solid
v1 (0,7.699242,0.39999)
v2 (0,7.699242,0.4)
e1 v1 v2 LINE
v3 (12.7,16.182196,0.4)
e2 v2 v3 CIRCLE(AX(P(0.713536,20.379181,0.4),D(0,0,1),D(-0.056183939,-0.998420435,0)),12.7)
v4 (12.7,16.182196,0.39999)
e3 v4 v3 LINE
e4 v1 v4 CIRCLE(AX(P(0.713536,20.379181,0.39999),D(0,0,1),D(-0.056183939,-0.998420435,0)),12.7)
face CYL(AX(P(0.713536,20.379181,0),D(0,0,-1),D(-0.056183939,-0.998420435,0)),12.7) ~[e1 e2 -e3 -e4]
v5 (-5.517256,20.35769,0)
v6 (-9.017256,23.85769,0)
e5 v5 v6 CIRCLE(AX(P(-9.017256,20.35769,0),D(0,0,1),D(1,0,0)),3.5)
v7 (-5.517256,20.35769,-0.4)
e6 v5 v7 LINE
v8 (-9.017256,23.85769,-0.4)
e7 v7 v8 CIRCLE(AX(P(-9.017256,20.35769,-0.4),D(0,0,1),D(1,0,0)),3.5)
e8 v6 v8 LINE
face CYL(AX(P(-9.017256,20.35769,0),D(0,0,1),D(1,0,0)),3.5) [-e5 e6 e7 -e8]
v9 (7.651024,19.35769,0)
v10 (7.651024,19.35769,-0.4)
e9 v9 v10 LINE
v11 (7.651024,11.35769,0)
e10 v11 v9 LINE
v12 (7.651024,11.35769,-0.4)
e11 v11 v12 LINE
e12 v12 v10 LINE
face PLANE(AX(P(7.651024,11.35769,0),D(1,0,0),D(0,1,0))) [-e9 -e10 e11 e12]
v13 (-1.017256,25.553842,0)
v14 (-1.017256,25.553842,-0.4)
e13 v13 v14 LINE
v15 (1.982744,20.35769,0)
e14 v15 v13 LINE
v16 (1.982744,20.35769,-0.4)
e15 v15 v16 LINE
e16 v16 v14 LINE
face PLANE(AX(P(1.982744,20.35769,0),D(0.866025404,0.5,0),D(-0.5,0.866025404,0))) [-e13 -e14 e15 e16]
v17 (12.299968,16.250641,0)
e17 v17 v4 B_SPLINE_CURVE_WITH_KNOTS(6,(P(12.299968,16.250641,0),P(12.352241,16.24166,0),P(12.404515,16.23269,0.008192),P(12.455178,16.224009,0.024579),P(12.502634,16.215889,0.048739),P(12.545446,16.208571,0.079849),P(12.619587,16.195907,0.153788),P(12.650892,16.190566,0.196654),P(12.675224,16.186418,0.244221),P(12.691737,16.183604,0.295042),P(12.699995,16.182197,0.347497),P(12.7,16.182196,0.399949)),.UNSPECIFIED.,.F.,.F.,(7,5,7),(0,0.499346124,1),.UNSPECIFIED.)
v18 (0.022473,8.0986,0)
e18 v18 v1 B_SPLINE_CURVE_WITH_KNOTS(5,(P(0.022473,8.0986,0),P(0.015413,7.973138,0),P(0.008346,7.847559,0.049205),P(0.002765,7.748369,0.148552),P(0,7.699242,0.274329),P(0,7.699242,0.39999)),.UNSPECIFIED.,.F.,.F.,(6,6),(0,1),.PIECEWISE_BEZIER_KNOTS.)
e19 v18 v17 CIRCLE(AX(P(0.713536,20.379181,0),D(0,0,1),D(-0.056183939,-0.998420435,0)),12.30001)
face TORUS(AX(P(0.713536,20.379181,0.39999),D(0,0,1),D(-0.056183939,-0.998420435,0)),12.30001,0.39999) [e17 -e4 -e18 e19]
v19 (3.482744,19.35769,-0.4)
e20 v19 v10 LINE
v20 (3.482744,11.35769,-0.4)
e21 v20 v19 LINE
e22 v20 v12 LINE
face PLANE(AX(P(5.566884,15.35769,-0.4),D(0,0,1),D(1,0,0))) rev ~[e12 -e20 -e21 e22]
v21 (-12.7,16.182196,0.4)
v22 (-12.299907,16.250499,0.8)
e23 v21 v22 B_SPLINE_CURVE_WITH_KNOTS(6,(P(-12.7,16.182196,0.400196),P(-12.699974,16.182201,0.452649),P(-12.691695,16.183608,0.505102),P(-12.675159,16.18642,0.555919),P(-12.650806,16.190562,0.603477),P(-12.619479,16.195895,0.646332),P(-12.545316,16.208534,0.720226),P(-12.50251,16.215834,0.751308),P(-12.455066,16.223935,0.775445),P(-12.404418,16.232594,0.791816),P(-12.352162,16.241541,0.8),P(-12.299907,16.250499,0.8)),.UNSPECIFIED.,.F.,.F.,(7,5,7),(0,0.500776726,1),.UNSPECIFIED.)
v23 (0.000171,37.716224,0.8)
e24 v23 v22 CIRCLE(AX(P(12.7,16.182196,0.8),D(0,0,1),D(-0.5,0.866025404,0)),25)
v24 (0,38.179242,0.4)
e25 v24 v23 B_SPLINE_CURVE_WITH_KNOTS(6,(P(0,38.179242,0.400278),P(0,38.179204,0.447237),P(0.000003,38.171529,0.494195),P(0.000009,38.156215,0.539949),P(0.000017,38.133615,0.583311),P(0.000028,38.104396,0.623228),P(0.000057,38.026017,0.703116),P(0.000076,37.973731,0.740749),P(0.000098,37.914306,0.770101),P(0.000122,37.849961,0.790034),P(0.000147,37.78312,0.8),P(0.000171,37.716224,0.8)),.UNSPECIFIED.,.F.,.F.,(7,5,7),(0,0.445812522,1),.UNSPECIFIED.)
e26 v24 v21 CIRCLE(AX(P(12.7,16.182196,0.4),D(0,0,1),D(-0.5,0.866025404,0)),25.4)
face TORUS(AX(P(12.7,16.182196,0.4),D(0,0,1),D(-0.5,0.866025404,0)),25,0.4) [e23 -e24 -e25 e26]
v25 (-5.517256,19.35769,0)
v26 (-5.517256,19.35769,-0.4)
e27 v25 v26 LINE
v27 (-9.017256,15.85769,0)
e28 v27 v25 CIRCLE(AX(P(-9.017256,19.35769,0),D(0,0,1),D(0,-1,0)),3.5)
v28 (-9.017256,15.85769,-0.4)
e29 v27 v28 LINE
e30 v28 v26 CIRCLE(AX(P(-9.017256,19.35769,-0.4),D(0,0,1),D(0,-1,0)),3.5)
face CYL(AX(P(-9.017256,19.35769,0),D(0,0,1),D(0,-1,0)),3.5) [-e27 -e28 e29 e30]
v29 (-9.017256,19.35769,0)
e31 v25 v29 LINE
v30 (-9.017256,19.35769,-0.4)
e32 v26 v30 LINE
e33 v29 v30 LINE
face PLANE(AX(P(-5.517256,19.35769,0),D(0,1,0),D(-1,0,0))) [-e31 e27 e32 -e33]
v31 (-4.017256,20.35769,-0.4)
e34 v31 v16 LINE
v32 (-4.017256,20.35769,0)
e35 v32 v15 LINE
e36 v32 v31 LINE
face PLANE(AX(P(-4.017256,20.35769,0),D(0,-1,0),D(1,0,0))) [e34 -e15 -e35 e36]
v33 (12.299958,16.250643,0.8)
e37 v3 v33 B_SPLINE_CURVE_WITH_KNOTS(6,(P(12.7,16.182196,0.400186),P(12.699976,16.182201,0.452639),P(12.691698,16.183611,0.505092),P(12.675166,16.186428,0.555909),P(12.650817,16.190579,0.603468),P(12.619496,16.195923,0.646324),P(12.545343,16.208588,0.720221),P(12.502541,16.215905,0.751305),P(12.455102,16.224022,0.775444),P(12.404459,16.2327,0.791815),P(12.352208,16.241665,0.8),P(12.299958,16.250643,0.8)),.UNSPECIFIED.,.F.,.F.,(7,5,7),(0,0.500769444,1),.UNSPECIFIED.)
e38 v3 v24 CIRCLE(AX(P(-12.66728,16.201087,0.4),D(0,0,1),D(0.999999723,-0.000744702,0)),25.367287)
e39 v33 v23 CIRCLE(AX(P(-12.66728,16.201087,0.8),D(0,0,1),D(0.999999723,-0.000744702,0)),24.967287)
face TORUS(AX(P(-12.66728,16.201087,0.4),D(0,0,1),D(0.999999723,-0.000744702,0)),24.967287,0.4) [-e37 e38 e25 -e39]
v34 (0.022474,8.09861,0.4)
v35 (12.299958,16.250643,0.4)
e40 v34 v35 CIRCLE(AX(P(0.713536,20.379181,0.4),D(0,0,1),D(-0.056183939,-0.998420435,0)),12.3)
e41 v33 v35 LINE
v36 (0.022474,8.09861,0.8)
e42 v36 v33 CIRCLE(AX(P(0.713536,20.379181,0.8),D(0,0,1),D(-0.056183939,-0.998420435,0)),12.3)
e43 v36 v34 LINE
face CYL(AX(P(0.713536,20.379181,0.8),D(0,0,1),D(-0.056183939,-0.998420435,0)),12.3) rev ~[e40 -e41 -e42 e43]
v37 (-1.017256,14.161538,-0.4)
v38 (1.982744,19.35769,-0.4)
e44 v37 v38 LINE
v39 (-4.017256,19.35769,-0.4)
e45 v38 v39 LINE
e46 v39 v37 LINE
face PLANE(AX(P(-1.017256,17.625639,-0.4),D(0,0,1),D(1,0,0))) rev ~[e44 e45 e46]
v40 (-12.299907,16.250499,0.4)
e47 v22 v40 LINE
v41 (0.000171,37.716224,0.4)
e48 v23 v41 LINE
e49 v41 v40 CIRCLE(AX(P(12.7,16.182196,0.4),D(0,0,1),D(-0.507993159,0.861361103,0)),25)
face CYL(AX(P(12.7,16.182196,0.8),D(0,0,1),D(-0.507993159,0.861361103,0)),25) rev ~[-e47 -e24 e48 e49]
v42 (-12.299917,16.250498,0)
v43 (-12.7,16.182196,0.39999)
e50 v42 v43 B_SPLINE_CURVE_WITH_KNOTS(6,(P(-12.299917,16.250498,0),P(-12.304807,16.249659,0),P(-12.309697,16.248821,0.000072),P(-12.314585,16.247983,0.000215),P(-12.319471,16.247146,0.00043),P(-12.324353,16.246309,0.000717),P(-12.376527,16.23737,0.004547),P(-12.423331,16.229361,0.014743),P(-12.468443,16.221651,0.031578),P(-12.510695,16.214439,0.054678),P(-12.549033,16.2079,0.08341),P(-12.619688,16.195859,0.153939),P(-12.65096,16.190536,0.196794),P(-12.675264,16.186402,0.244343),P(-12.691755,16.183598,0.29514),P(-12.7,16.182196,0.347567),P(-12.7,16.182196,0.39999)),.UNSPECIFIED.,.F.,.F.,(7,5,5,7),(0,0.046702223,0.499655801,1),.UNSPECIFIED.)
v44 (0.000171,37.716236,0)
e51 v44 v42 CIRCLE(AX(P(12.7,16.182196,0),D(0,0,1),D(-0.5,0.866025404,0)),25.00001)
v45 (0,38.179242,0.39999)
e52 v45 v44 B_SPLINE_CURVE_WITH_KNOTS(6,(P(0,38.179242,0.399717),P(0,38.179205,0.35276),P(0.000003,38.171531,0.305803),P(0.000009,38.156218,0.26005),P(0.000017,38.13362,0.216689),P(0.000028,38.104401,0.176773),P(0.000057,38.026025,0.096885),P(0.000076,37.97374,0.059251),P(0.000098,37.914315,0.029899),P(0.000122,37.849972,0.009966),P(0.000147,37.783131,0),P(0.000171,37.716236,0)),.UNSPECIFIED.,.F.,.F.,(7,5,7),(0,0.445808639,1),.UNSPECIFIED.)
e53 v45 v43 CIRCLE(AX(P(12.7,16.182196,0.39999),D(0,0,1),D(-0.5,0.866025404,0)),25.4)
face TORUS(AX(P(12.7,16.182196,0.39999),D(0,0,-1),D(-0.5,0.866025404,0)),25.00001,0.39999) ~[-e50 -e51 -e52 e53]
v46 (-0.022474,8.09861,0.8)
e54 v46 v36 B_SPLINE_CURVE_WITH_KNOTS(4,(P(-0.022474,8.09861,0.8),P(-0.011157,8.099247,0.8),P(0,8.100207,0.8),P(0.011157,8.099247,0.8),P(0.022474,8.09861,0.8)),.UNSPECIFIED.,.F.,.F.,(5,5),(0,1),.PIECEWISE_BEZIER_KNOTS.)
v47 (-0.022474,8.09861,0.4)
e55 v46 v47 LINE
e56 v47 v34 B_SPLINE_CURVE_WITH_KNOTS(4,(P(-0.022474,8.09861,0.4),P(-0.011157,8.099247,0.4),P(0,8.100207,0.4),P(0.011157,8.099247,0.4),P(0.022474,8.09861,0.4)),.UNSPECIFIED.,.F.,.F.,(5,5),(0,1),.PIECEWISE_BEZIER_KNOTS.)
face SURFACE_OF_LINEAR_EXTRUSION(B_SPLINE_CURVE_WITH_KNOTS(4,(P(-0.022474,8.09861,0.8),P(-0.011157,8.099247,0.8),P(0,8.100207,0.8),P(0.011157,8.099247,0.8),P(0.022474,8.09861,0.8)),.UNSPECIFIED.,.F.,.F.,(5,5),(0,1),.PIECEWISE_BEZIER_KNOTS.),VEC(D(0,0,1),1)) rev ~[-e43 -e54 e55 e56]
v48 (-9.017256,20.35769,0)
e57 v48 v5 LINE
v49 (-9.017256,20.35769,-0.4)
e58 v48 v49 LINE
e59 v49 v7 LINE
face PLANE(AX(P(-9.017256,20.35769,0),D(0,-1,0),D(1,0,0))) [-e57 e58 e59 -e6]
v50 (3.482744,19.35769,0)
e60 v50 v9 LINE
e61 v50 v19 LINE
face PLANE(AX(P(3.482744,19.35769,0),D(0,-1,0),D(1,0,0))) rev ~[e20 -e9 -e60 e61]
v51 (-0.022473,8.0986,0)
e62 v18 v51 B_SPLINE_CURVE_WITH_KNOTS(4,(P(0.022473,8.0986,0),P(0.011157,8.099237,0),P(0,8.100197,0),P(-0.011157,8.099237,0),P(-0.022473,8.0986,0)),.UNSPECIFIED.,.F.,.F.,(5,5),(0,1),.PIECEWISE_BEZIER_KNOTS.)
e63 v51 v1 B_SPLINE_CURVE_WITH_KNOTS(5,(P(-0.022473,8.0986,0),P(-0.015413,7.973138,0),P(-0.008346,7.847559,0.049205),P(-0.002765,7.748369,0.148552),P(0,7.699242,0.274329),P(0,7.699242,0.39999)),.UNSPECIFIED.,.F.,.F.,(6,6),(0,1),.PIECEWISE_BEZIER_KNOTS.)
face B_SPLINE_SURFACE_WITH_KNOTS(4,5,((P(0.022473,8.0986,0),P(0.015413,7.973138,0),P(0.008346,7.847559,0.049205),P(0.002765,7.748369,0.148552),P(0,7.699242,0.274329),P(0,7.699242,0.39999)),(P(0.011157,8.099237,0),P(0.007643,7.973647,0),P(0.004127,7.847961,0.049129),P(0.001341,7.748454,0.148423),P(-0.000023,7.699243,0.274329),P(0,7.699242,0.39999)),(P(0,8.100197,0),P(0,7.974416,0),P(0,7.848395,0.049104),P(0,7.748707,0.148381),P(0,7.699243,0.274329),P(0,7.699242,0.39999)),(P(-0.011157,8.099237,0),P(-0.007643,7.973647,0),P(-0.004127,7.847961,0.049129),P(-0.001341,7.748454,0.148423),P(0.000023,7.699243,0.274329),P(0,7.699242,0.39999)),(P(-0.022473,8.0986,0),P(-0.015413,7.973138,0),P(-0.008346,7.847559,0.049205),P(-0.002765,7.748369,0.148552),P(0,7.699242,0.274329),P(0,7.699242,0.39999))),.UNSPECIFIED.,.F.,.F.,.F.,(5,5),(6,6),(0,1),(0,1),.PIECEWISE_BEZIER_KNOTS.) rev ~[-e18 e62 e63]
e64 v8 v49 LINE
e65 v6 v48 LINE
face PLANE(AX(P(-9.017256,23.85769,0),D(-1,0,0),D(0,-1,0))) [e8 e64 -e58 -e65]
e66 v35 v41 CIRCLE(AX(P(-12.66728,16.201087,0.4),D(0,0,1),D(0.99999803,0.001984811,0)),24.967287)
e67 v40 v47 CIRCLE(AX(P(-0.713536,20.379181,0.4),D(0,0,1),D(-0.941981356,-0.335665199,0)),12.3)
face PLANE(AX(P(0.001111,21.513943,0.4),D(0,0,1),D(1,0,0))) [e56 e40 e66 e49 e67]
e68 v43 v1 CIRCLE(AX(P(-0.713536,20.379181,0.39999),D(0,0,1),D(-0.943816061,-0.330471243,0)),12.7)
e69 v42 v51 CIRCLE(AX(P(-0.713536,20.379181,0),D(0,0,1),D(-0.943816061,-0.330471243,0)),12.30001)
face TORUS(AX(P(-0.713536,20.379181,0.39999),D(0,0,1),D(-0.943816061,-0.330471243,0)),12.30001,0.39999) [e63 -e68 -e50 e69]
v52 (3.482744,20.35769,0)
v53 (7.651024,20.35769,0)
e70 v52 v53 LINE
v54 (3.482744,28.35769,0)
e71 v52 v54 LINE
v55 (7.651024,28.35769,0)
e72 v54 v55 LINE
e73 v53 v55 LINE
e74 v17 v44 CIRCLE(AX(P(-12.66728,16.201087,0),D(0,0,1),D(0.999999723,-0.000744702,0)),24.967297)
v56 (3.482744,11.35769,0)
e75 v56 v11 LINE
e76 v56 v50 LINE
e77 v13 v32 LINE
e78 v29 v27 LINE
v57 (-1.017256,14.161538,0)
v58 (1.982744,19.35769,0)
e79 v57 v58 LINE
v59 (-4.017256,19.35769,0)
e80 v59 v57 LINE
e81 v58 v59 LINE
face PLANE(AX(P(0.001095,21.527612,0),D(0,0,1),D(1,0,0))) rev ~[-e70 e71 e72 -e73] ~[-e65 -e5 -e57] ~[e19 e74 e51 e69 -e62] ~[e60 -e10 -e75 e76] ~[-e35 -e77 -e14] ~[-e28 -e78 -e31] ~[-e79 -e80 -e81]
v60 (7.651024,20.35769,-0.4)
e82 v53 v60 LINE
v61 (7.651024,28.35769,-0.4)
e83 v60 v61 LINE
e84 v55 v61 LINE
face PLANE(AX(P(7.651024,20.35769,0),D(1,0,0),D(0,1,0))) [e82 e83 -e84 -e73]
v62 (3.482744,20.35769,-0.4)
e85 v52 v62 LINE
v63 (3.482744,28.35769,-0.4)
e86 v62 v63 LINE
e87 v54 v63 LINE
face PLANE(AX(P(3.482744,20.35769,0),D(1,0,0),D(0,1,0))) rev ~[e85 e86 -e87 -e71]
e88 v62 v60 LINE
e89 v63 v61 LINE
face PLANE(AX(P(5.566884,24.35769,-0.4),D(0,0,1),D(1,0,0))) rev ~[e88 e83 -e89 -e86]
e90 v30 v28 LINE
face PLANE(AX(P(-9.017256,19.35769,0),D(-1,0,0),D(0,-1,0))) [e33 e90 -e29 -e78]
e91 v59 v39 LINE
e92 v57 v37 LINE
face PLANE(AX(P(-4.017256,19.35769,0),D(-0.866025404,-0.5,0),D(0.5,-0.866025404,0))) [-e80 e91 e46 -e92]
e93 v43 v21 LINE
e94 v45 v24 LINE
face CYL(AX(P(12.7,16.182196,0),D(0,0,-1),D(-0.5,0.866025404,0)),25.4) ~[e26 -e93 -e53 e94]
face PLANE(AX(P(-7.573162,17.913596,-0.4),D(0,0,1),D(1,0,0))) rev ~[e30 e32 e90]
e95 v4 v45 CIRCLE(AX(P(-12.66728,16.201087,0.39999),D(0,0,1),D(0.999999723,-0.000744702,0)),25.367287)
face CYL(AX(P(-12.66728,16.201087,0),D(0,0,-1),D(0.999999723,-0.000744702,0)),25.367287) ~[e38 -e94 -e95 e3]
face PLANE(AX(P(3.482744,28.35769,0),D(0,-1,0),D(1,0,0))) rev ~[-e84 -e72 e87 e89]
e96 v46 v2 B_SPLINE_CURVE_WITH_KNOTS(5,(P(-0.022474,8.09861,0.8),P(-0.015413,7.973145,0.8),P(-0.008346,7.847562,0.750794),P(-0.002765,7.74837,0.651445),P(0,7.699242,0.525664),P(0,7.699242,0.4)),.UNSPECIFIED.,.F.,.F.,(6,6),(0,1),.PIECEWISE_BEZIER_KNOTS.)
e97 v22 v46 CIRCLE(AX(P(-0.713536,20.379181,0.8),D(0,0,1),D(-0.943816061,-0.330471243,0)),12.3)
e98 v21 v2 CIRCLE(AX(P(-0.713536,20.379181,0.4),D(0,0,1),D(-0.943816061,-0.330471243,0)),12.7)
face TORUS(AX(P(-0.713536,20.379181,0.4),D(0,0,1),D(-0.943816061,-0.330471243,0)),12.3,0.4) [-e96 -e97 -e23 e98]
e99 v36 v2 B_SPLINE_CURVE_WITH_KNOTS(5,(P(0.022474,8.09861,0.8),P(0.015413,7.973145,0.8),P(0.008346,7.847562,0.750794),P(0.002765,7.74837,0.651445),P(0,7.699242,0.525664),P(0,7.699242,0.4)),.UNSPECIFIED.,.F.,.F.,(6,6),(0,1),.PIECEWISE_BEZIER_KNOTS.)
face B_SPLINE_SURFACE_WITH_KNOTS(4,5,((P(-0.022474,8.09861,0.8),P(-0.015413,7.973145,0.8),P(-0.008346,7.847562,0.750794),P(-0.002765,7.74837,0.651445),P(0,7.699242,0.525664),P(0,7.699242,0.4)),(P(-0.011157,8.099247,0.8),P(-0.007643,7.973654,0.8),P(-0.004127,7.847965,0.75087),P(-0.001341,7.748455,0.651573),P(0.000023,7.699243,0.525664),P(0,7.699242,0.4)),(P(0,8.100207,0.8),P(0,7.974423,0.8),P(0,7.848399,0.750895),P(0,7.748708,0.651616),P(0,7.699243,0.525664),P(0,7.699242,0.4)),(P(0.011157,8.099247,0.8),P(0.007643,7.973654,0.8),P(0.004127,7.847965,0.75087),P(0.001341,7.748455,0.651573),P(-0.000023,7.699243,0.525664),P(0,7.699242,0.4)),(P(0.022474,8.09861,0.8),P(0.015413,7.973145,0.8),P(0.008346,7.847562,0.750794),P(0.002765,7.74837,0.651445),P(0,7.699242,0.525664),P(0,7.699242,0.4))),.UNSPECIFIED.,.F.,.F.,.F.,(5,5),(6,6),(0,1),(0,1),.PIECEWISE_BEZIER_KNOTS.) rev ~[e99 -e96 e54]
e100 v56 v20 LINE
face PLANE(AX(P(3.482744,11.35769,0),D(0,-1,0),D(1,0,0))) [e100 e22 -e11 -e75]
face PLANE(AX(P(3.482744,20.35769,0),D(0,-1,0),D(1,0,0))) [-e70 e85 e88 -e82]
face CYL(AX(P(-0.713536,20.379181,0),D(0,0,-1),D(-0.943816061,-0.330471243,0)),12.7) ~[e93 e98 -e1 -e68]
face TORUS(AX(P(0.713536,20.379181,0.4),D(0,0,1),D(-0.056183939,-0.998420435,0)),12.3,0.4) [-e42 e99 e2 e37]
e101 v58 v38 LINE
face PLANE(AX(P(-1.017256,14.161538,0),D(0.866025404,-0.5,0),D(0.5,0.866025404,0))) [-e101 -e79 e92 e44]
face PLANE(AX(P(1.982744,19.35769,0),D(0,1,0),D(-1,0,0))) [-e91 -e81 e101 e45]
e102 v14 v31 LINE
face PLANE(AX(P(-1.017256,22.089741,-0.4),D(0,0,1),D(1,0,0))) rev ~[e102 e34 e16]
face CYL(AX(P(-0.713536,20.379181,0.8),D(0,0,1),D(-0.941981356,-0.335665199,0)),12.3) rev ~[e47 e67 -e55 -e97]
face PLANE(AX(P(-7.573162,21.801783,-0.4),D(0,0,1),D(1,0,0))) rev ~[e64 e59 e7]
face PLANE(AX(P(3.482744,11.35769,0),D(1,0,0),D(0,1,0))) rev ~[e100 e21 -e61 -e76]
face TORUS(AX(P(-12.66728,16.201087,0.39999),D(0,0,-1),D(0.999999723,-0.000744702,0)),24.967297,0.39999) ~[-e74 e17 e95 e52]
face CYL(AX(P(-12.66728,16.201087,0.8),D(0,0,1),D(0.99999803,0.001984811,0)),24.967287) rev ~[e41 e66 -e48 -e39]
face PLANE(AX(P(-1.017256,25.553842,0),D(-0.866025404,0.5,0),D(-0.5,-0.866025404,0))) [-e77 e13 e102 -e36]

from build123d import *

# Parameters (mm, degrees)
F1_DEPTH = 0.8
F2_R     = 0.4
F3_R     = 0.39999
F4_W     = 4.168279469
F4_H     = 8
F5_DEPTH = 0.4
F6_DEPTH = 0.4


# Not quite as in the source:
# - a fillet or chamfer is up to 0.001 mm smaller than in the source, because OpenCascade refuses the exact size


with BuildPart() as f1:
    # F0 (on Top) → F1 (new body)
    with BuildSketch(Plane.XY):
        with BuildLine():
            ThreePointArc((0, 38.1792416396), (-9.2970452561, 28.8821963835), (-12.7, 16.1821963835))
            ThreePointArc((-12.7, 16.1821963835), (-7.7676026835, 9.8183978835), (0, 7.6992416396))
            ThreePointArc((0, 7.6992416396), (7.7676026835, 9.8183978835), (12.7, 16.1821963835))
            ThreePointArc((12.7, 16.1821963835), (9.3014350381, 28.8847308253), (0, 38.1792416396))
        make_face()
    extrude(amount=F1_DEPTH)

    # F2
    f2_edges = [f1.edges().sort_by_distance(p)[0] for p in [
        (-9.297045, 28.882196, 0.8),
        (-7.767603, 9.818398, 0.8),
        (7.767603, 9.818398, 0.8),
        (9.301435, 28.884731, 0.8),
    ]]
    fillet(f2_edges, radius=F2_R)

    # F3 (radius 0.4 in the source; OpenCascade refuses exactly that, so slightly less here)
    f3_edges = [f1.edges().sort_by_distance(p)[0] for p in [
        (7.767603, 9.818398, 0),
        (9.301435, 28.884731, 0),
        (-7.767603, 9.818398, 0),
        (-9.297045, 28.882196, 0),
    ]]
    fillet(f3_edges, radius=F3_R)

    # F4 (on Top) + F1_face (on face) + F1_face1 (on face) → F5 (cut)
    with BuildSketch(Plane.XY):
        Polygon((1.9827442754, 19.357689971), (-4.0172557246, 19.357689971), (-1.0172557246, 14.1615375483), align=None)
        with BuildLine():
            Line((-9.0172557246, 19.357689971), (-9.0172557246, 15.857689971))
            ThreePointArc((-9.0172557246, 15.857689971), (-6.5423819904, 16.8828162368), (-5.5172557246, 19.357689971))
            Line((-5.5172557246, 19.357689971), (-9.0172557246, 19.357689971))
        make_face()
        Polygon((-1.0172557246, 25.5538423937), (-4.0172557246, 20.357689971), (1.9827442754, 20.357689971), align=None)
        with Locations((5.56688401, 15.357689971)):
            Rectangle(F4_W, F4_H)
        with BuildLine():
            Line((-9.0172557246, 20.357689971), (-5.5172557246, 20.357689971))
            ThreePointArc((-5.5172557246, 20.357689971), (-6.5423819904, 22.8325637051), (-9.0172557246, 23.857689971))
            Line((-9.0172557246, 23.857689971), (-9.0172557246, 20.357689971))
        make_face()
        with Locations((5.56688401, 24.357689971)):
            Rectangle(F4_W, F4_H)
    with BuildSketch(Plane(origin=(0.0014081173, 21.2624606857, 0.8), x_dir=(1, 0, 0), z_dir=(0, 0, 1))):
        with BuildLine():
            ThreePointArc((-0.0012370935, 16.4537632815), (-8.9926932828, 7.3490618207), (-12.3013148115, -5.0119614651))
            ThreePointArc((-12.3013148115, -5.0119614651), (-7.5186387645, -11.1302175722), (-0.0238816927, -13.1638508721))
            add(Edge.make_bspline(
                [(-0.0238816927, -13.1638508721), (-0.0125655835, -13.1632140826), (-0.0014081173, -13.1622533084), (0.009749349, -13.1632140826), (0.0210654582, -13.1638508721)],
                knots=[0, 0, 0, 0, 0, 1, 1, 1, 1, 1], degree=4))
            ThreePointArc((0.0210654582, -13.1638508721), (7.5158860187, -11.1301754171), (12.2985497378, -5.0118178891))
            ThreePointArc((12.2985497378, -5.0118178891), (8.9943044567, 7.3515302466), (-0.0012370935, 16.4537632815))
        make_face()
    with BuildSketch(Plane(origin=(0.001408117, 21.262461098, 0), x_dir=(1, 0, 0), z_dir=(0, 0, -1))):
        with BuildLine():
            ThreePointArc((12.2985597415, 5.0118200202), (7.5158922747, 11.1301836793), (0.0210648966, 13.1638612686))
            add(Edge.make_bspline(
                [(0.0210648966, 13.1638612686), (0.0097490703, 13.1632244951), (-0.001408117, 13.1622637449), (-0.0125653043, 13.1632244951), (-0.0238811306, 13.1638612686)],
                knots=[0, 0, 0, 0, 0, 1, 1, 1, 1, 1], degree=4))
            ThreePointArc((-0.0238811306, 13.1638612686), (-7.5186450215, 11.1302258334), (-12.301324816, 5.0119635927))
            ThreePointArc((-12.301324816, 5.0119635927), (-8.9927009274, -7.3490681805), (-0.0012370975, -16.4537744762))
            ThreePointArc((-0.0012370975, -16.4537744762), (8.9943121009, -7.3515366081), (12.2985597415, 5.0118200202))
        make_face()
    extrude(amount=-F5_DEPTH, dir=(0, 0, 1), mode=Mode.SUBTRACT)

    # F4 (on Top) → F6 (join)
    with BuildSketch(Plane.XY):
        with BuildLine():
            Line((-9.0172557246, 19.357689971), (-9.0172557246, 15.857689971))
            ThreePointArc((-9.0172557246, 15.857689971), (-6.5423819904, 16.8828162368), (-5.5172557246, 19.357689971))
            Line((-5.5172557246, 19.357689971), (-9.0172557246, 19.357689971))
        make_face()
        with BuildLine():
            Line((-9.0172557246, 20.357689971), (-5.5172557246, 20.357689971))
            ThreePointArc((-5.5172557246, 20.357689971), (-6.5423819904, 22.8325637051), (-9.0172557246, 23.857689971))
            Line((-9.0172557246, 23.857689971), (-9.0172557246, 20.357689971))
        make_face()
        Polygon((-1.0172557246, 25.5538423937), (-4.0172557246, 20.357689971), (1.9827442754, 20.357689971), align=None)
        Polygon((1.9827442754, 19.357689971), (-4.0172557246, 19.357689971), (-1.0172557246, 14.1615375483), align=None)
        with Locations((5.56688401, 24.357689971)):
            Rectangle(F4_W, F4_H)
        with Locations((5.56688401, 15.357689971)):
            Rectangle(F4_W, F4_H)
    extrude(amount=-F6_DEPTH)


solid = f1.part
